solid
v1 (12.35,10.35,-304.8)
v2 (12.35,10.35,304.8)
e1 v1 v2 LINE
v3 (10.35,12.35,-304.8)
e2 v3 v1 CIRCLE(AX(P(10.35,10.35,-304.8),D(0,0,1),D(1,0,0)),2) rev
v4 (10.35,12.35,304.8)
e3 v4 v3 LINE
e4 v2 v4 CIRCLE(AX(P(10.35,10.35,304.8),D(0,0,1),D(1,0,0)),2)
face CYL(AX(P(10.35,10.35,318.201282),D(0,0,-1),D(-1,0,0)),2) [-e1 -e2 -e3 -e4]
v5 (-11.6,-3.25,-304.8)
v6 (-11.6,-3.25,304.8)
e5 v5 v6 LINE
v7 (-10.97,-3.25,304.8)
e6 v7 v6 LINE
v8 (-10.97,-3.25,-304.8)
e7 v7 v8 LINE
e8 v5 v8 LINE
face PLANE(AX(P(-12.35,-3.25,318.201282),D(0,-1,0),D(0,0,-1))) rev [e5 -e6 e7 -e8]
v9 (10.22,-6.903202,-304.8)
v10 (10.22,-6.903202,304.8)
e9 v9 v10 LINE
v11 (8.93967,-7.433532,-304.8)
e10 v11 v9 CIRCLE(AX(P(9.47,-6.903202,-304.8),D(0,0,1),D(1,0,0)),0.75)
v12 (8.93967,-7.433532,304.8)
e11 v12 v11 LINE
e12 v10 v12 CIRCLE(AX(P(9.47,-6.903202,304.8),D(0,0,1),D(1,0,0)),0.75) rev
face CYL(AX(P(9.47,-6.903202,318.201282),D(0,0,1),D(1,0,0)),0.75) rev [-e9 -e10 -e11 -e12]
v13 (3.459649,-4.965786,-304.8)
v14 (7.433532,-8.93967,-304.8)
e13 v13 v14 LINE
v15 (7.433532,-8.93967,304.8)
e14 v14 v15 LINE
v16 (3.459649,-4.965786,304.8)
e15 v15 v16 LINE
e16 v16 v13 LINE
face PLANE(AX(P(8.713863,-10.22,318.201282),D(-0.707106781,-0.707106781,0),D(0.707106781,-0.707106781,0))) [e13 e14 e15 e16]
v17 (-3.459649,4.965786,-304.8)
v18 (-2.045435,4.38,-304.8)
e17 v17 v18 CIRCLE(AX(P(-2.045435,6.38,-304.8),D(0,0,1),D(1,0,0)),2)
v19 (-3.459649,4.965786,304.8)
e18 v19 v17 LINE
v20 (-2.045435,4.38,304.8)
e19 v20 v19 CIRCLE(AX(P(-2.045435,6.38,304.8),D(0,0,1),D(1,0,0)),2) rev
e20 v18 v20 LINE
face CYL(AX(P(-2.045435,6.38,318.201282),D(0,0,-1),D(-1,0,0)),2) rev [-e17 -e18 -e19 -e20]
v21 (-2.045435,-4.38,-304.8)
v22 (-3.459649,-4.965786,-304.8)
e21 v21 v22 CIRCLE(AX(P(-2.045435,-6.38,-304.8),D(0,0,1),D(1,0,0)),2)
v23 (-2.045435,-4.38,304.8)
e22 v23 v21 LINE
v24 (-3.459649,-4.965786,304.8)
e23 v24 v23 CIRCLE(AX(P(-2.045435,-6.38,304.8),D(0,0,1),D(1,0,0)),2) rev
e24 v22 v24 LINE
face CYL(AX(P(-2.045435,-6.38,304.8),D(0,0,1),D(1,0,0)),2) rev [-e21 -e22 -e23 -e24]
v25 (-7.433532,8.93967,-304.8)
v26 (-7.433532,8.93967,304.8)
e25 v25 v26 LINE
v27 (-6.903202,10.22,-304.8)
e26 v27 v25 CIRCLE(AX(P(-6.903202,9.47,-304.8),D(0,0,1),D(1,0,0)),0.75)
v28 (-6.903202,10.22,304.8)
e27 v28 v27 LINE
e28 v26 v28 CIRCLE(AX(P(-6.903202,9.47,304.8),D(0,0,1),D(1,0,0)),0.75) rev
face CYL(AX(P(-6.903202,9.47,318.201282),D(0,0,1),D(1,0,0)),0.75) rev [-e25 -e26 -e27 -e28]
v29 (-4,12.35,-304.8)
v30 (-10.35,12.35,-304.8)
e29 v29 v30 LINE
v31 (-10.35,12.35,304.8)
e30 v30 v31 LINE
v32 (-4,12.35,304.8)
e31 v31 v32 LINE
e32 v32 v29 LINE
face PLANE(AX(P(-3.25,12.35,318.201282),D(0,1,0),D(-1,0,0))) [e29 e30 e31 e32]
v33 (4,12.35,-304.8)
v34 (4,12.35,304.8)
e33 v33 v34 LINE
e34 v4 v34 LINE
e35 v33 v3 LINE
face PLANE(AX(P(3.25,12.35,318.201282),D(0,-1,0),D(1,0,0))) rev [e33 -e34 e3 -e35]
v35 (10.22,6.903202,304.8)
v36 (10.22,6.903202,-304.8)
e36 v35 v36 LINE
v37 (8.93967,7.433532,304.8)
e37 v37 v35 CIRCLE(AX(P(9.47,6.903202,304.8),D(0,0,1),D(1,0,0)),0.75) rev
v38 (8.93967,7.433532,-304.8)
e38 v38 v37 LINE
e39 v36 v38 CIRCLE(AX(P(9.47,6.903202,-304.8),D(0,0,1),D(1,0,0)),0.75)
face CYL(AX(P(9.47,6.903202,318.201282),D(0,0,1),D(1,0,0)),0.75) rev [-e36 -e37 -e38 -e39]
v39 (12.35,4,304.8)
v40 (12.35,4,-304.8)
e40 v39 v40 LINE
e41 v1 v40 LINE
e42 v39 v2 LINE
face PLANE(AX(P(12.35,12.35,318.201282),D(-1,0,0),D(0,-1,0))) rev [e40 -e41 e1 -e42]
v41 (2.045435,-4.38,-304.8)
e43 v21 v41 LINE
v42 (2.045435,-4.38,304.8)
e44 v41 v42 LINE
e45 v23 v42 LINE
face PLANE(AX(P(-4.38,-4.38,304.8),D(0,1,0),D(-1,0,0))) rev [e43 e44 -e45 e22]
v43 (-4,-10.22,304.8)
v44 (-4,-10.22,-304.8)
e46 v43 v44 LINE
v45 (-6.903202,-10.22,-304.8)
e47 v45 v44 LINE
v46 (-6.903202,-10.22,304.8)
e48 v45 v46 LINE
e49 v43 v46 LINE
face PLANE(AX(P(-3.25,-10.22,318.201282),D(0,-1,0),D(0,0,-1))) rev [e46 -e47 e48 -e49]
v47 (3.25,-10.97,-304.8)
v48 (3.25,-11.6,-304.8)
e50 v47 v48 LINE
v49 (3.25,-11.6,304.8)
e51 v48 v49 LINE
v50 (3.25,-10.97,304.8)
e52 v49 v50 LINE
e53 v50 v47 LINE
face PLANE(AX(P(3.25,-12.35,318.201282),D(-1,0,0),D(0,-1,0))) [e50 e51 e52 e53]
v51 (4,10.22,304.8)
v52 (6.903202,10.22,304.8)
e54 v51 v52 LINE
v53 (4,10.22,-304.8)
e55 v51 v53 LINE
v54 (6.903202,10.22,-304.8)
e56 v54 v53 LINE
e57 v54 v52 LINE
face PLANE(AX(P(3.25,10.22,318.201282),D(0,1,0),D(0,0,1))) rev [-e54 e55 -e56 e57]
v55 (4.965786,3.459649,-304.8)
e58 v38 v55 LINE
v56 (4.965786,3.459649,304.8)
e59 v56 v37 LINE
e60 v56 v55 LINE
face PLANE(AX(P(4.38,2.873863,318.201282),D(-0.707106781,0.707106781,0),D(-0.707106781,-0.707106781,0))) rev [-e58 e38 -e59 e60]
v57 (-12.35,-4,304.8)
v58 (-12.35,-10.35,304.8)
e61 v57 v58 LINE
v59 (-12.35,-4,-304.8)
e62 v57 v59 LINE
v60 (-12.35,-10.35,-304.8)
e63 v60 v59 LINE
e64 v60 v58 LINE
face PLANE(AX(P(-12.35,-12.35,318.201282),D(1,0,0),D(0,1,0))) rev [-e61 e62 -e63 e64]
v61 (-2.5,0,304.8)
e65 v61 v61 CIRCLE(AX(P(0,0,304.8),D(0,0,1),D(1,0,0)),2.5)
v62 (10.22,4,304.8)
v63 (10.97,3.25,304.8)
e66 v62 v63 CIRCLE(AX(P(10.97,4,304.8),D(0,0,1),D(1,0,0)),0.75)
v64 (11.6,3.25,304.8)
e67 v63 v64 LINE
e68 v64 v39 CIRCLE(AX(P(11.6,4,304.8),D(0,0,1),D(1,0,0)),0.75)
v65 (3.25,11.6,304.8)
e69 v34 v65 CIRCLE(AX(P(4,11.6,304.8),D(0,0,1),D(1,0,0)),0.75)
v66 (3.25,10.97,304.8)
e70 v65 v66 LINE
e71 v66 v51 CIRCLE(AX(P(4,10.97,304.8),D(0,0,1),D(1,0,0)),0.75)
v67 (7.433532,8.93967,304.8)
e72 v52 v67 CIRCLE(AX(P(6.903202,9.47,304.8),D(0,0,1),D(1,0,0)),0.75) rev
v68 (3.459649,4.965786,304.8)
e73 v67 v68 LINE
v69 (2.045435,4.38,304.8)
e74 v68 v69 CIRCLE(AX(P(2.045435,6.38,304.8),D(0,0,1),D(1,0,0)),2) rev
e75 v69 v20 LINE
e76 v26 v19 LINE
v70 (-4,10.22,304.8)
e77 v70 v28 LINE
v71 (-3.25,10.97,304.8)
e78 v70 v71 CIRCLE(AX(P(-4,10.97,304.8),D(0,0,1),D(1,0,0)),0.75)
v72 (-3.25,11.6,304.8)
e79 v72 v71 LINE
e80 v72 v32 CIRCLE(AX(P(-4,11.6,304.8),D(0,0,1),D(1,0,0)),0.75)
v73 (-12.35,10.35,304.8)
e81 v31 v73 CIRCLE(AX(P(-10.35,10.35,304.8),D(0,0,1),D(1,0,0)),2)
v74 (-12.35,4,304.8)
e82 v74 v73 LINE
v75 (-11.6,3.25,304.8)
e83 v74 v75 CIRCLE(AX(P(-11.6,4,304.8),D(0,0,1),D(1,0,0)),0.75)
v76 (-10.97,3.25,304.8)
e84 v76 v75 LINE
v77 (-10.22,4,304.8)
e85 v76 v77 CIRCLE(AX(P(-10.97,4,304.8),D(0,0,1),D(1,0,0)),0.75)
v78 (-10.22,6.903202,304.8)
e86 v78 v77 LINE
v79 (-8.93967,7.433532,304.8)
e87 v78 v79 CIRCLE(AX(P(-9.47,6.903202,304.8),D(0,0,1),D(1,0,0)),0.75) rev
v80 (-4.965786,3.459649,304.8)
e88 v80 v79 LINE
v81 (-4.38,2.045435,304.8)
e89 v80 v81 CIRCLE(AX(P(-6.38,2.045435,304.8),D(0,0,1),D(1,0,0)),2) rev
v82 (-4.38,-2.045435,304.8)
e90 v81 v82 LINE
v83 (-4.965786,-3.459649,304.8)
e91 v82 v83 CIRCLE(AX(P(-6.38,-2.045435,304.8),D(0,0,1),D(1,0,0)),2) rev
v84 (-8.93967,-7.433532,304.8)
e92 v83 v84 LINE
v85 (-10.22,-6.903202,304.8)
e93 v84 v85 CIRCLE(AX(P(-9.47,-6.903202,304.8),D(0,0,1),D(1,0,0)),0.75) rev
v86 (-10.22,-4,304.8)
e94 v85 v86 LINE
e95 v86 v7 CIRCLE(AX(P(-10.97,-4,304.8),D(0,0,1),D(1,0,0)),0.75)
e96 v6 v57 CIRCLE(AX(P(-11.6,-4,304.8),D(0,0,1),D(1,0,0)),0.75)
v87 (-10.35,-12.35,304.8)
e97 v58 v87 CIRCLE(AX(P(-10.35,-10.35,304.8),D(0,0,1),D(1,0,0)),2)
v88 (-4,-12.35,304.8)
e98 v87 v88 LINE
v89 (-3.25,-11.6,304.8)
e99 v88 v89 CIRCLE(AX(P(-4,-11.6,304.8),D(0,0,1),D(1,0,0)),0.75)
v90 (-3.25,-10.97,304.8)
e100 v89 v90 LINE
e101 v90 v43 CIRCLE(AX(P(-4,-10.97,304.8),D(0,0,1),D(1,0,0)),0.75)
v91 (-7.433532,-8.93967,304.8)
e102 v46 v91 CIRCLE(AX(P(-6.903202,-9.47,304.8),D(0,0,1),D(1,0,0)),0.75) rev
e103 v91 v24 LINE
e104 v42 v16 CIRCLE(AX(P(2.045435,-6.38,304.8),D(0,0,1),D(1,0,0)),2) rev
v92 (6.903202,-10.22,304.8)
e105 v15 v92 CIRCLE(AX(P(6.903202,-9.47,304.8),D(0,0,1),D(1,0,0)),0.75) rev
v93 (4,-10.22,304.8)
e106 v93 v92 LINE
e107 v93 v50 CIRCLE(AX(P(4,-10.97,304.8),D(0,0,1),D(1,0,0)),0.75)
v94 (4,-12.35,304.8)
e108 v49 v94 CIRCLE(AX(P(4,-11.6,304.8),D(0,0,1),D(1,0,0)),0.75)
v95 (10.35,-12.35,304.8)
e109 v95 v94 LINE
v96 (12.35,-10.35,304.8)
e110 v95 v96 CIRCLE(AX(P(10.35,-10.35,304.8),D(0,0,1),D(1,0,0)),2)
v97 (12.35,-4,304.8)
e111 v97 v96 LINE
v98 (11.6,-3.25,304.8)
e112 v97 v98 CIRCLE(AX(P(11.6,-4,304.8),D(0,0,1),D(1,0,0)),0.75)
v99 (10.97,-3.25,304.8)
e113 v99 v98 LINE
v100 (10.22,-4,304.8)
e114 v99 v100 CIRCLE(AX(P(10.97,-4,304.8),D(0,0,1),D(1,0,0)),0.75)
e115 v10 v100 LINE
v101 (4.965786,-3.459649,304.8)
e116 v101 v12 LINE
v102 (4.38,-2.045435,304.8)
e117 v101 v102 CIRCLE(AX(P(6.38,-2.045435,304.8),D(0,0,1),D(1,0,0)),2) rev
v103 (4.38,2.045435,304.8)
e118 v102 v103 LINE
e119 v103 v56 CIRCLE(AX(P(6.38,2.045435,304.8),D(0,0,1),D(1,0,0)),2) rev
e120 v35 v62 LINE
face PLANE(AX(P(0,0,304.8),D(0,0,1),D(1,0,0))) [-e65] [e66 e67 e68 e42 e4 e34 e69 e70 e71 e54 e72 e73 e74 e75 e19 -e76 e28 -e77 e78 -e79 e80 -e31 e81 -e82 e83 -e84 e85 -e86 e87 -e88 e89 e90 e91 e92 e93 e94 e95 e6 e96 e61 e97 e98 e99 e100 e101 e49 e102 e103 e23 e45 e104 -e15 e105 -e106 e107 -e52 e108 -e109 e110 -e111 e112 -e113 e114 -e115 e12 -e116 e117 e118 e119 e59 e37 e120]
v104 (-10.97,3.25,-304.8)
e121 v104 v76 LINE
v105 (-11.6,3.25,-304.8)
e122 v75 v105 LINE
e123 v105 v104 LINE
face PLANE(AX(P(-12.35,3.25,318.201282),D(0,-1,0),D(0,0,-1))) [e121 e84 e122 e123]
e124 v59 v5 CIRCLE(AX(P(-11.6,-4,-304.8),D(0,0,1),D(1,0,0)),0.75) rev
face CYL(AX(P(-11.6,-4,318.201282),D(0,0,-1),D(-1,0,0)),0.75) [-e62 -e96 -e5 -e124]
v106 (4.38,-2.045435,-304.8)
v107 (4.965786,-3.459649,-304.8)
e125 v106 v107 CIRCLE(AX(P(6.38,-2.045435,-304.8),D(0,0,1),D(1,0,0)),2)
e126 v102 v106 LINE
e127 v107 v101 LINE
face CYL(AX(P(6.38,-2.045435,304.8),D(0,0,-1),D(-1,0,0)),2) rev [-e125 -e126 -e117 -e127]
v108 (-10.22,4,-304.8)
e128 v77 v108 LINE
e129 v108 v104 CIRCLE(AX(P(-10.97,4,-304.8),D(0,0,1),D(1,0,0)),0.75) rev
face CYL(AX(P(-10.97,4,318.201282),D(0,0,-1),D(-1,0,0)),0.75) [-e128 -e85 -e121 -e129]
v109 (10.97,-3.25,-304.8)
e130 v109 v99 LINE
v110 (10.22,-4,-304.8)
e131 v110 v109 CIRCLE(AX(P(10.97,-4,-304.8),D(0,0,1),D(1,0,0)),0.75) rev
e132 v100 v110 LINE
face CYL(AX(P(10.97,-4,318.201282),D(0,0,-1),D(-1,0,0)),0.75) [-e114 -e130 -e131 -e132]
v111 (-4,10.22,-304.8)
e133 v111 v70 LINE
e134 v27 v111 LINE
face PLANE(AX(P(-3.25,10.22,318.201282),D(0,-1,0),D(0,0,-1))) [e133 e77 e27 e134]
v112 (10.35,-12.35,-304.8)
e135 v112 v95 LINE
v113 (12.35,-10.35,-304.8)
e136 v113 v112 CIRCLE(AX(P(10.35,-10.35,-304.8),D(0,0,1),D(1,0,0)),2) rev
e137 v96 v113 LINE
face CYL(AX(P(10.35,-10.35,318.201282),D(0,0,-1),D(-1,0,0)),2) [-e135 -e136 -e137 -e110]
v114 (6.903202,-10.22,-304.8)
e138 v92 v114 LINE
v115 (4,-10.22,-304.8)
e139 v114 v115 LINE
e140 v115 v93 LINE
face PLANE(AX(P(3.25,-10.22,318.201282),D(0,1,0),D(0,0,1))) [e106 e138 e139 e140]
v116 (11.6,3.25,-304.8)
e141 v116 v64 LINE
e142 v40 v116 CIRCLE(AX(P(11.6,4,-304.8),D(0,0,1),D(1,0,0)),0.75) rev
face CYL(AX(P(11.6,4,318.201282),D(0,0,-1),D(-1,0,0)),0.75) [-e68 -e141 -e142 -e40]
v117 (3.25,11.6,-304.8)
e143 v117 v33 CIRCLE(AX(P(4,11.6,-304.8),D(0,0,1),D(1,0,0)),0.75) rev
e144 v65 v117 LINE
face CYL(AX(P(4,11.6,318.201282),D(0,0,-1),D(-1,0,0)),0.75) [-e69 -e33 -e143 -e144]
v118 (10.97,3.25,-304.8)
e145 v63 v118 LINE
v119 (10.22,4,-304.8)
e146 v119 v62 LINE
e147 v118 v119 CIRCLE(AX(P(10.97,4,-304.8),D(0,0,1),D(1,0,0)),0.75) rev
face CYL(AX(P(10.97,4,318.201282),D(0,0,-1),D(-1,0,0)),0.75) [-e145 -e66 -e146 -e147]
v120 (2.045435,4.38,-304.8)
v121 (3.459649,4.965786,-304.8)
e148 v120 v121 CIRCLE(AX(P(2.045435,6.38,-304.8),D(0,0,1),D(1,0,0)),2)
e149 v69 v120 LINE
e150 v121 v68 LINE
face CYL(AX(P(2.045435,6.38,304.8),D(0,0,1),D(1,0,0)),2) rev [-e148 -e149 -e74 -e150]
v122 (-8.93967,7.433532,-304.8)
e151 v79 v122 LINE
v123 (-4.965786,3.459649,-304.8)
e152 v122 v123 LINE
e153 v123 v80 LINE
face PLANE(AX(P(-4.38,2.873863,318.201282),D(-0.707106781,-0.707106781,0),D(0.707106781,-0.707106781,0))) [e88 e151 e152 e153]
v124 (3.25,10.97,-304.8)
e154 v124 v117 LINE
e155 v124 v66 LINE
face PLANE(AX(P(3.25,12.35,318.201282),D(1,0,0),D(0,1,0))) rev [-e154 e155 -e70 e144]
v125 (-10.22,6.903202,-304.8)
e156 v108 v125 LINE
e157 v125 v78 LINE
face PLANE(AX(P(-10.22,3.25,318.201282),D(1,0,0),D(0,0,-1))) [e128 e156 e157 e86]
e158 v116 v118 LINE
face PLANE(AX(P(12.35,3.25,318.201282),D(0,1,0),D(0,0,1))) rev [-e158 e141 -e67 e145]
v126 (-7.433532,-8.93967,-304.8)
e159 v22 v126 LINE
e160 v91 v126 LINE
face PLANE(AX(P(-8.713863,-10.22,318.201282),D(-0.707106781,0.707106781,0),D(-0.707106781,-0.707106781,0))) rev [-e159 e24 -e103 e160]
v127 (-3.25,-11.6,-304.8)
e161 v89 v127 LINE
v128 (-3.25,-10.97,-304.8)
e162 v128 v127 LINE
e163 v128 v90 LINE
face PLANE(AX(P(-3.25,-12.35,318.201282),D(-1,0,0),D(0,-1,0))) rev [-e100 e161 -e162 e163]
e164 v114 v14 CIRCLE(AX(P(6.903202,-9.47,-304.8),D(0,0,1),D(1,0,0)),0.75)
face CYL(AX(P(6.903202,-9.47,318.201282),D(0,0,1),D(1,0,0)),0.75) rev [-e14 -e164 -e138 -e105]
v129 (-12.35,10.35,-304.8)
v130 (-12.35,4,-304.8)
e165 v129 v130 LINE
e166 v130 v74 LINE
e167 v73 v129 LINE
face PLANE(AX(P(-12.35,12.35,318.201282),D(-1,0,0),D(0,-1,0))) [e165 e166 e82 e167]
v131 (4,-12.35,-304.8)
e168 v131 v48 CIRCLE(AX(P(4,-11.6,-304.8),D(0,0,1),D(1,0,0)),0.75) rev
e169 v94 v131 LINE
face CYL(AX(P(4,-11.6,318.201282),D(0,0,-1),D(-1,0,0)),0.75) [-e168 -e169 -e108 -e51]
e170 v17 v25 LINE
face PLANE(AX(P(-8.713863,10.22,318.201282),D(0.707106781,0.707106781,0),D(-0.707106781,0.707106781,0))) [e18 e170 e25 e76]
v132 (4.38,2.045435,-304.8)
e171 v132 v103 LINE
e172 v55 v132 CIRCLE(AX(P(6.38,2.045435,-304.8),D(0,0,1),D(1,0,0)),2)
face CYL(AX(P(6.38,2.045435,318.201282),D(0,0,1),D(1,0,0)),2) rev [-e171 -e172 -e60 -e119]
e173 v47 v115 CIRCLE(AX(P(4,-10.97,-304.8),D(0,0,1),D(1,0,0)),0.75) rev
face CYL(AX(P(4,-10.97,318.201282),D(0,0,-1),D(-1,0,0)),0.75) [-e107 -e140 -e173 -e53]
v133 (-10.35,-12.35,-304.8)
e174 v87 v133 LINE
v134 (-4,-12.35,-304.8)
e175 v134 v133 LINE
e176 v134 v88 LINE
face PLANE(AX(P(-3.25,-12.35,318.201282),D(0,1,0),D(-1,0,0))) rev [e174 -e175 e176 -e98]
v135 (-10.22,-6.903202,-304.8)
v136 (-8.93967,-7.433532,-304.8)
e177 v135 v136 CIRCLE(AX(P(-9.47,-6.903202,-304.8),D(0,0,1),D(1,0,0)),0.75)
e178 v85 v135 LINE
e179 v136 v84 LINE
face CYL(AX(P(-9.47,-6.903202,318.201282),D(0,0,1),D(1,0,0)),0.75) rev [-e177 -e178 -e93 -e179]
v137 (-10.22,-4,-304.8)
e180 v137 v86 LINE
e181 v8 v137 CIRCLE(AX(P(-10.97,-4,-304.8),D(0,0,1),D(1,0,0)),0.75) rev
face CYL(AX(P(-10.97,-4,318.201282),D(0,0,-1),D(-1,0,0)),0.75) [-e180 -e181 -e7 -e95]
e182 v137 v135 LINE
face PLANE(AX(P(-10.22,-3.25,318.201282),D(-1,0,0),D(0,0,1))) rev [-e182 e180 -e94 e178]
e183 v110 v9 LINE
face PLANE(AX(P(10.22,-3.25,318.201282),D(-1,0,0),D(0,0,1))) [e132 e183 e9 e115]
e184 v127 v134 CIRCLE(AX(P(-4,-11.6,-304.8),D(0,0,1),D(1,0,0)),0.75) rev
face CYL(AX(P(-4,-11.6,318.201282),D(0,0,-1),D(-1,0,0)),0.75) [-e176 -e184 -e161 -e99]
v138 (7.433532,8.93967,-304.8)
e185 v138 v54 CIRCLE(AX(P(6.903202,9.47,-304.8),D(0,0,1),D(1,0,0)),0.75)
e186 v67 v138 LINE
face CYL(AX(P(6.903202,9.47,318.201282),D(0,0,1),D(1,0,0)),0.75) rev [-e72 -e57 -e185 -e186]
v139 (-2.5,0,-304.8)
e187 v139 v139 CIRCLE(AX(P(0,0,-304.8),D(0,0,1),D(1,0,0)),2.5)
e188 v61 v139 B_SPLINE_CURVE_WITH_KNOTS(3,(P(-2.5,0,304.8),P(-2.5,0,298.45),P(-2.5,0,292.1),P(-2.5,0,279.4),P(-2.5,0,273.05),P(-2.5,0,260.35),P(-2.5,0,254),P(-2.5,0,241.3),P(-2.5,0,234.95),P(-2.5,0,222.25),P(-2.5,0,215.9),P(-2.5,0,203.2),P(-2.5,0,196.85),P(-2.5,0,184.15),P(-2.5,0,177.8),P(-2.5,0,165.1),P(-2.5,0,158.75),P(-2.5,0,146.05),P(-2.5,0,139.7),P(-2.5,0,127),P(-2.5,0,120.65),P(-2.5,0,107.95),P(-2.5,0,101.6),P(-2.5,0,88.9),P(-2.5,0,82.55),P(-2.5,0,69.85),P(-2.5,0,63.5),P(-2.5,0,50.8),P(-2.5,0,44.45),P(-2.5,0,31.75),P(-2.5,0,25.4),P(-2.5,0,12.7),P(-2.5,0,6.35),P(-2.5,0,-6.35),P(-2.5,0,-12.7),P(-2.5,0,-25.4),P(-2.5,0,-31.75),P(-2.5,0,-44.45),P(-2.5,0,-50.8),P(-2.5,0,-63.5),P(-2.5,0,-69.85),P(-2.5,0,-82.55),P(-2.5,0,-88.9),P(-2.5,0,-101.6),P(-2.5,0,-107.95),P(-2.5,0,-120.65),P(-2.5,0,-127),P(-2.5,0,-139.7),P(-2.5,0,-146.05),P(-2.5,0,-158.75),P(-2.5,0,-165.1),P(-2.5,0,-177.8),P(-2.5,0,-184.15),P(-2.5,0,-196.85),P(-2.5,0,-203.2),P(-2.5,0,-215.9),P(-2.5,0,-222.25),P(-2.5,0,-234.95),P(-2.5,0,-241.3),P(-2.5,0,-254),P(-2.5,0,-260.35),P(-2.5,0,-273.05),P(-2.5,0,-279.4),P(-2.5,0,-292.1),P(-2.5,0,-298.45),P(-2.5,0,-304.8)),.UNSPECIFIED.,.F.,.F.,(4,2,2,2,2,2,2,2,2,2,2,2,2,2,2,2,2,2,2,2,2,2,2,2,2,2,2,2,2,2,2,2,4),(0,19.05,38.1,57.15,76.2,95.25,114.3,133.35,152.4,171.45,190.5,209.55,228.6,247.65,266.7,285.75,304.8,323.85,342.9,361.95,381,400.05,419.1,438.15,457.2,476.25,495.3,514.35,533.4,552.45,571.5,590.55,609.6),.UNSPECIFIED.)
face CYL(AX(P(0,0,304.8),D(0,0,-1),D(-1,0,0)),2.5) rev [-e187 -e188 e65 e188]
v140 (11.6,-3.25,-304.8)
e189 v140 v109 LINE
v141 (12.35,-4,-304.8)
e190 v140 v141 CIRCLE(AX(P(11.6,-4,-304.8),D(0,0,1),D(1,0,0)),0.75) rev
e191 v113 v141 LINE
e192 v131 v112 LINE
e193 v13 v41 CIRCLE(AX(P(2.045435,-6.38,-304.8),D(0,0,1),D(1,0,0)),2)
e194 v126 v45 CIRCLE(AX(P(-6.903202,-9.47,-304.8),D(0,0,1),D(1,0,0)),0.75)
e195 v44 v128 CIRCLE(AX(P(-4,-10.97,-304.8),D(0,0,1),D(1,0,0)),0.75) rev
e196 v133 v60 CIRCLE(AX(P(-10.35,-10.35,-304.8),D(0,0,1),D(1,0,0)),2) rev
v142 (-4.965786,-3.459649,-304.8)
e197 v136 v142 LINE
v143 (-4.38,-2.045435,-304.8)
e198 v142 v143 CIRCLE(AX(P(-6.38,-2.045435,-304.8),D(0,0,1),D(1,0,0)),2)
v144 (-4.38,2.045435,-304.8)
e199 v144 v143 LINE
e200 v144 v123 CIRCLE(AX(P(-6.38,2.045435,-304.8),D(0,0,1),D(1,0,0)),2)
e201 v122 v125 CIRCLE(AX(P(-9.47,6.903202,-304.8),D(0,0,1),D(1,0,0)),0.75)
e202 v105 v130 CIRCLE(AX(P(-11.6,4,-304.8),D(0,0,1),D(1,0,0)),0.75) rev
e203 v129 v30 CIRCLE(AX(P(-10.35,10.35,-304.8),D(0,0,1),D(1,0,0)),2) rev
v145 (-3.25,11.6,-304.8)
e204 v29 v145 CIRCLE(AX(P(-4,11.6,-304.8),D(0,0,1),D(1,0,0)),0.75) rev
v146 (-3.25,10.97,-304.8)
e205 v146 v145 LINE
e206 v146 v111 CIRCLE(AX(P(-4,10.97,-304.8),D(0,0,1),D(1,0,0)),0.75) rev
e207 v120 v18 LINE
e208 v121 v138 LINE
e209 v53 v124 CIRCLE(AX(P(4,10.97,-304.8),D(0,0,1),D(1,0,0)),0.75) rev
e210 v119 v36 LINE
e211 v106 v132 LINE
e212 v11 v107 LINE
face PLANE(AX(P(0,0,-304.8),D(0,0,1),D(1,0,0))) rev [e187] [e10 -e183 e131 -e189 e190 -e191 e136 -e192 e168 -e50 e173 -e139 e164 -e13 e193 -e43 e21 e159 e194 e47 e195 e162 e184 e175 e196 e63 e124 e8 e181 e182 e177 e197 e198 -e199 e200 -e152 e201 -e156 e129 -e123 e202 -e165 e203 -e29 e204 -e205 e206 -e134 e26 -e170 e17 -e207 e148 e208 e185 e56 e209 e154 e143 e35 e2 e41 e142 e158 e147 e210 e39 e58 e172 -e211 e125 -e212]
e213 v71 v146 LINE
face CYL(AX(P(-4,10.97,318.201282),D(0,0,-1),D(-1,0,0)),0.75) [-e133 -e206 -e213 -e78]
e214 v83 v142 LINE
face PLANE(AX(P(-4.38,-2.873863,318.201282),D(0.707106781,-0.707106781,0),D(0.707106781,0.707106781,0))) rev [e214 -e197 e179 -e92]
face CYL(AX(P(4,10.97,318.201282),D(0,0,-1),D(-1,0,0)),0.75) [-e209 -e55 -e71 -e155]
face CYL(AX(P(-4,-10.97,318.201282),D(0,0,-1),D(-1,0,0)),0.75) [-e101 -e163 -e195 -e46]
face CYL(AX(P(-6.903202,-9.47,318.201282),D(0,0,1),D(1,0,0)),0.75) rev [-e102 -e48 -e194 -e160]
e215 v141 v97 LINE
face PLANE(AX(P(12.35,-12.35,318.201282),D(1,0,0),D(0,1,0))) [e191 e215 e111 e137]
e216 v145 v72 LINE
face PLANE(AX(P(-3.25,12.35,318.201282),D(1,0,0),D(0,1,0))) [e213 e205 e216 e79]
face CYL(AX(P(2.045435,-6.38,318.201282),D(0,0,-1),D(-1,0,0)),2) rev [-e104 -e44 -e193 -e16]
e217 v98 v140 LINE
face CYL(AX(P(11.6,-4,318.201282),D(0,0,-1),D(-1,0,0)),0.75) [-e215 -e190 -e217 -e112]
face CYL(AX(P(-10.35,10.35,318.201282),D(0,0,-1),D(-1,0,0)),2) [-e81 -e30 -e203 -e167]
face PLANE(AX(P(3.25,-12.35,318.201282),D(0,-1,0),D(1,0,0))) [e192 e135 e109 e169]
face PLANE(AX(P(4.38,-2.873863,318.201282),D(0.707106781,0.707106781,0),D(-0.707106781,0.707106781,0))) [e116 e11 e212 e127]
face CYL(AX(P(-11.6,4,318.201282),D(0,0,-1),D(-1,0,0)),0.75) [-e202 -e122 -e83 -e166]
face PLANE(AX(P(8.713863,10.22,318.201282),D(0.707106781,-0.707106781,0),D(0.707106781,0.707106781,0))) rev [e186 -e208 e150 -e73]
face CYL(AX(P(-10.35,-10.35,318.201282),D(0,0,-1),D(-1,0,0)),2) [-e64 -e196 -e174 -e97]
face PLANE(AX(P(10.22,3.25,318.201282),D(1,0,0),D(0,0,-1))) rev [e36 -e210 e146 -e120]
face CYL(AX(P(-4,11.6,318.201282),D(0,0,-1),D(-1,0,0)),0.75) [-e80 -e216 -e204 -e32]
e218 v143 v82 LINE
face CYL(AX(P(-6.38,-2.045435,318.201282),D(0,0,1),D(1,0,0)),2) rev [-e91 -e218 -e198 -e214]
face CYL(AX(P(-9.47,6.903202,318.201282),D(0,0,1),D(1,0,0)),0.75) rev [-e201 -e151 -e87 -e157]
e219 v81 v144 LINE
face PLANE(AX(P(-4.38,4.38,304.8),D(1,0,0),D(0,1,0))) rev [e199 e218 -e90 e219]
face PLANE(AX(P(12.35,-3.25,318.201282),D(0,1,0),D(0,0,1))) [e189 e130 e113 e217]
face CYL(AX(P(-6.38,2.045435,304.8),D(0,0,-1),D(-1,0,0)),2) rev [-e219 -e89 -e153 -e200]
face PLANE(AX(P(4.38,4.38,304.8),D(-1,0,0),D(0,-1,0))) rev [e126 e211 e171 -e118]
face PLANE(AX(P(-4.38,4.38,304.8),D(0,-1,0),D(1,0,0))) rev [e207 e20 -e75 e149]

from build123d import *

# Parameters (mm, degrees)
SKETCH2_W            = 8.76
SKETCH2_H            = 8.76
SKETCH2_R            = 2.5
BOSS_EXTRUDE1_DEPTH  = 304.8
BOSS_EXTRUDE2_START  = -304.8
BOSS_EXTRUDE2_DEPTH  = 609.6
FILLET1_R            = 0.75
FILLET1_OF_MIRROR1_R = 0.75
MIRROR2_START        = -304.8
MIRROR2_DEPTH        = 609.6
FILLET2_R            = 2


# Read off the part's stored shape, not the designer's step: Mirror2
with BuildPart() as part:
    # Sketch2 → Boss-Extrude1 (new, symmetric)
    with BuildSketch(Plane.XY):
        Rectangle(SKETCH2_W, SKETCH2_H)
        with Locations(Location((0, 0, 0), (0, 0, 180))):
            Circle(SKETCH2_R, mode=Mode.SUBTRACT)
    extrude(amount=BOSS_EXTRUDE1_DEPTH, both=True)

    # Sketch3 → Boss-Extrude2 (add)
    with BuildSketch(Plane.XY.offset(BOSS_EXTRUDE2_START)):
        Polygon((3.25, 12.35), (12.35, 12.35), (12.35, 3.25), (10.22, 3.25), (10.22, 8.713862556), (4.38, 2.873862556), (4.38, 4.38), (2.873862556, 4.38), (8.713862556, 10.22), (3.25, 10.22), align=None)
    boss_extrude2 = extrude(amount=BOSS_EXTRUDE2_DEPTH)

    # Fillet1
    fillet1_edges = [part.edges().sort_by_distance(p)[0] for p in [
        (3.25, 12.35, 0),
        (3.25, 10.22, 0),
        (8.713862556, 10.22, 0),
        (10.22, 8.713862556, 0),
        (10.22, 3.25, 0),
        (12.35, 3.25, 0),
    ]]
    fillet(fillet1_edges, radius=FILLET1_R)

    # Mirror1: Boss-Extrude2 across plane
    add(boss_extrude2.mirror(Plane.ZX))

    # Fillet1 of Mirror1
    fillet1_of_mirror1_edges = [part.edges().sort_by_distance(p)[0] for p in [
        (3.25, -12.35, 0),
        (3.25, -10.22, 0),
        (8.713862556, -10.22, 0),
        (10.22, -8.713862556, 0),
        (10.22, -3.25, 0),
        (12.35, -3.25, 0),
    ]]
    fillet(fillet1_of_mirror1_edges, radius=FILLET1_OF_MIRROR1_R)

    # Mirror2 outline → Mirror2 (add)
    with BuildSketch(Plane.XY.offset(MIRROR2_START)):
        with BuildLine():
            ThreePointArc((-7.43353247, 8.939669914), (-7.596112034, 9.757012574), (-6.903202384, 10.22))
            Line((-6.903202384, 10.22), (-4, 10.22))
            ThreePointArc((-4, 10.22), (-3.469669914, 10.439669914), (-3.25, 10.97))
            Line((-3.25, 10.97), (-3.25, 11.6))
            ThreePointArc((-3.25, 11.6), (-3.469669914, 12.130330086), (-4, 12.35))
            Line((-4, 12.35), (-12.35, 12.35))
            Line((-12.35, 12.35), (-12.35, 4))
            ThreePointArc((-12.35, 4), (-12.130330086, 3.469669914), (-11.6, 3.25))
            Line((-11.6, 3.25), (-10.97, 3.25))
            ThreePointArc((-10.97, 3.25), (-10.439669914, 3.469669914), (-10.22, 4))
            Line((-10.22, 4), (-10.22, 6.903202384))
            ThreePointArc((-10.22, 6.903202384), (-9.757012574, 7.596112034), (-8.939669914, 7.43353247))
            Line((-8.939669914, 7.43353247), (-4.38, 2.873862556))
            Line((-4.38, 2.873862556), (-4.38, 4.38))
            Line((-4.38, 4.38), (-2.873862556, 4.38))
            Line((-2.873862556, 4.38), (-7.43353247, 8.939669914))
        make_face()
        with BuildLine():
            Line((-4.38, -4.38), (-4.38, -2.873862556))
            Line((-4.38, -2.873862556), (-8.939669914, -7.43353247))
            ThreePointArc((-8.939669914, -7.43353247), (-9.757012574, -7.596112034), (-10.22, -6.903202384))
            Line((-10.22, -6.903202384), (-10.22, -4))
            ThreePointArc((-10.22, -4), (-10.439669914, -3.469669914), (-10.97, -3.25))
            Line((-10.97, -3.25), (-11.6, -3.25))
            ThreePointArc((-11.6, -3.25), (-12.130330086, -3.469669914), (-12.35, -4))
            Line((-12.35, -4), (-12.35, -12.35))
            Line((-12.35, -12.35), (-4, -12.35))
            ThreePointArc((-4, -12.35), (-3.469669914, -12.130330086), (-3.25, -11.6))
            Line((-3.25, -11.6), (-3.25, -10.97))
            ThreePointArc((-3.25, -10.97), (-3.469669914, -10.439669914), (-4, -10.22))
            Line((-4, -10.22), (-6.903202384, -10.22))
            ThreePointArc((-6.903202384, -10.22), (-7.596112034, -9.757012574), (-7.43353247, -8.939669914))
            Line((-7.43353247, -8.939669914), (-2.873862556, -4.38))
            Line((-2.873862556, -4.38), (-4.38, -4.38))
        make_face()
    extrude(amount=MIRROR2_DEPTH)

    # Fillet2
    fillet2_edges = [part.edges().sort_by_distance(p)[0] for p in [
        (-2.873862556, -4.38, 0),
        (-4.38, -2.873862556, 0),
        (-12.35, -12.35, 0),
        (2.873862556, 4.38, 0),
        (4.38, 2.873862556, 0),
        (12.35, 12.35, 0),
        (-2.873862556, 4.38, 0),
        (-4.38, 2.873862556, 0),
        (-12.35, 12.35, 0),
        (2.873862556, -4.38, 0),
        (4.38, -2.873862556, 0),
        (12.35, -12.35, 0),
    ]]
    fillet(fillet2_edges, radius=FILLET2_R)


solid = part.part
